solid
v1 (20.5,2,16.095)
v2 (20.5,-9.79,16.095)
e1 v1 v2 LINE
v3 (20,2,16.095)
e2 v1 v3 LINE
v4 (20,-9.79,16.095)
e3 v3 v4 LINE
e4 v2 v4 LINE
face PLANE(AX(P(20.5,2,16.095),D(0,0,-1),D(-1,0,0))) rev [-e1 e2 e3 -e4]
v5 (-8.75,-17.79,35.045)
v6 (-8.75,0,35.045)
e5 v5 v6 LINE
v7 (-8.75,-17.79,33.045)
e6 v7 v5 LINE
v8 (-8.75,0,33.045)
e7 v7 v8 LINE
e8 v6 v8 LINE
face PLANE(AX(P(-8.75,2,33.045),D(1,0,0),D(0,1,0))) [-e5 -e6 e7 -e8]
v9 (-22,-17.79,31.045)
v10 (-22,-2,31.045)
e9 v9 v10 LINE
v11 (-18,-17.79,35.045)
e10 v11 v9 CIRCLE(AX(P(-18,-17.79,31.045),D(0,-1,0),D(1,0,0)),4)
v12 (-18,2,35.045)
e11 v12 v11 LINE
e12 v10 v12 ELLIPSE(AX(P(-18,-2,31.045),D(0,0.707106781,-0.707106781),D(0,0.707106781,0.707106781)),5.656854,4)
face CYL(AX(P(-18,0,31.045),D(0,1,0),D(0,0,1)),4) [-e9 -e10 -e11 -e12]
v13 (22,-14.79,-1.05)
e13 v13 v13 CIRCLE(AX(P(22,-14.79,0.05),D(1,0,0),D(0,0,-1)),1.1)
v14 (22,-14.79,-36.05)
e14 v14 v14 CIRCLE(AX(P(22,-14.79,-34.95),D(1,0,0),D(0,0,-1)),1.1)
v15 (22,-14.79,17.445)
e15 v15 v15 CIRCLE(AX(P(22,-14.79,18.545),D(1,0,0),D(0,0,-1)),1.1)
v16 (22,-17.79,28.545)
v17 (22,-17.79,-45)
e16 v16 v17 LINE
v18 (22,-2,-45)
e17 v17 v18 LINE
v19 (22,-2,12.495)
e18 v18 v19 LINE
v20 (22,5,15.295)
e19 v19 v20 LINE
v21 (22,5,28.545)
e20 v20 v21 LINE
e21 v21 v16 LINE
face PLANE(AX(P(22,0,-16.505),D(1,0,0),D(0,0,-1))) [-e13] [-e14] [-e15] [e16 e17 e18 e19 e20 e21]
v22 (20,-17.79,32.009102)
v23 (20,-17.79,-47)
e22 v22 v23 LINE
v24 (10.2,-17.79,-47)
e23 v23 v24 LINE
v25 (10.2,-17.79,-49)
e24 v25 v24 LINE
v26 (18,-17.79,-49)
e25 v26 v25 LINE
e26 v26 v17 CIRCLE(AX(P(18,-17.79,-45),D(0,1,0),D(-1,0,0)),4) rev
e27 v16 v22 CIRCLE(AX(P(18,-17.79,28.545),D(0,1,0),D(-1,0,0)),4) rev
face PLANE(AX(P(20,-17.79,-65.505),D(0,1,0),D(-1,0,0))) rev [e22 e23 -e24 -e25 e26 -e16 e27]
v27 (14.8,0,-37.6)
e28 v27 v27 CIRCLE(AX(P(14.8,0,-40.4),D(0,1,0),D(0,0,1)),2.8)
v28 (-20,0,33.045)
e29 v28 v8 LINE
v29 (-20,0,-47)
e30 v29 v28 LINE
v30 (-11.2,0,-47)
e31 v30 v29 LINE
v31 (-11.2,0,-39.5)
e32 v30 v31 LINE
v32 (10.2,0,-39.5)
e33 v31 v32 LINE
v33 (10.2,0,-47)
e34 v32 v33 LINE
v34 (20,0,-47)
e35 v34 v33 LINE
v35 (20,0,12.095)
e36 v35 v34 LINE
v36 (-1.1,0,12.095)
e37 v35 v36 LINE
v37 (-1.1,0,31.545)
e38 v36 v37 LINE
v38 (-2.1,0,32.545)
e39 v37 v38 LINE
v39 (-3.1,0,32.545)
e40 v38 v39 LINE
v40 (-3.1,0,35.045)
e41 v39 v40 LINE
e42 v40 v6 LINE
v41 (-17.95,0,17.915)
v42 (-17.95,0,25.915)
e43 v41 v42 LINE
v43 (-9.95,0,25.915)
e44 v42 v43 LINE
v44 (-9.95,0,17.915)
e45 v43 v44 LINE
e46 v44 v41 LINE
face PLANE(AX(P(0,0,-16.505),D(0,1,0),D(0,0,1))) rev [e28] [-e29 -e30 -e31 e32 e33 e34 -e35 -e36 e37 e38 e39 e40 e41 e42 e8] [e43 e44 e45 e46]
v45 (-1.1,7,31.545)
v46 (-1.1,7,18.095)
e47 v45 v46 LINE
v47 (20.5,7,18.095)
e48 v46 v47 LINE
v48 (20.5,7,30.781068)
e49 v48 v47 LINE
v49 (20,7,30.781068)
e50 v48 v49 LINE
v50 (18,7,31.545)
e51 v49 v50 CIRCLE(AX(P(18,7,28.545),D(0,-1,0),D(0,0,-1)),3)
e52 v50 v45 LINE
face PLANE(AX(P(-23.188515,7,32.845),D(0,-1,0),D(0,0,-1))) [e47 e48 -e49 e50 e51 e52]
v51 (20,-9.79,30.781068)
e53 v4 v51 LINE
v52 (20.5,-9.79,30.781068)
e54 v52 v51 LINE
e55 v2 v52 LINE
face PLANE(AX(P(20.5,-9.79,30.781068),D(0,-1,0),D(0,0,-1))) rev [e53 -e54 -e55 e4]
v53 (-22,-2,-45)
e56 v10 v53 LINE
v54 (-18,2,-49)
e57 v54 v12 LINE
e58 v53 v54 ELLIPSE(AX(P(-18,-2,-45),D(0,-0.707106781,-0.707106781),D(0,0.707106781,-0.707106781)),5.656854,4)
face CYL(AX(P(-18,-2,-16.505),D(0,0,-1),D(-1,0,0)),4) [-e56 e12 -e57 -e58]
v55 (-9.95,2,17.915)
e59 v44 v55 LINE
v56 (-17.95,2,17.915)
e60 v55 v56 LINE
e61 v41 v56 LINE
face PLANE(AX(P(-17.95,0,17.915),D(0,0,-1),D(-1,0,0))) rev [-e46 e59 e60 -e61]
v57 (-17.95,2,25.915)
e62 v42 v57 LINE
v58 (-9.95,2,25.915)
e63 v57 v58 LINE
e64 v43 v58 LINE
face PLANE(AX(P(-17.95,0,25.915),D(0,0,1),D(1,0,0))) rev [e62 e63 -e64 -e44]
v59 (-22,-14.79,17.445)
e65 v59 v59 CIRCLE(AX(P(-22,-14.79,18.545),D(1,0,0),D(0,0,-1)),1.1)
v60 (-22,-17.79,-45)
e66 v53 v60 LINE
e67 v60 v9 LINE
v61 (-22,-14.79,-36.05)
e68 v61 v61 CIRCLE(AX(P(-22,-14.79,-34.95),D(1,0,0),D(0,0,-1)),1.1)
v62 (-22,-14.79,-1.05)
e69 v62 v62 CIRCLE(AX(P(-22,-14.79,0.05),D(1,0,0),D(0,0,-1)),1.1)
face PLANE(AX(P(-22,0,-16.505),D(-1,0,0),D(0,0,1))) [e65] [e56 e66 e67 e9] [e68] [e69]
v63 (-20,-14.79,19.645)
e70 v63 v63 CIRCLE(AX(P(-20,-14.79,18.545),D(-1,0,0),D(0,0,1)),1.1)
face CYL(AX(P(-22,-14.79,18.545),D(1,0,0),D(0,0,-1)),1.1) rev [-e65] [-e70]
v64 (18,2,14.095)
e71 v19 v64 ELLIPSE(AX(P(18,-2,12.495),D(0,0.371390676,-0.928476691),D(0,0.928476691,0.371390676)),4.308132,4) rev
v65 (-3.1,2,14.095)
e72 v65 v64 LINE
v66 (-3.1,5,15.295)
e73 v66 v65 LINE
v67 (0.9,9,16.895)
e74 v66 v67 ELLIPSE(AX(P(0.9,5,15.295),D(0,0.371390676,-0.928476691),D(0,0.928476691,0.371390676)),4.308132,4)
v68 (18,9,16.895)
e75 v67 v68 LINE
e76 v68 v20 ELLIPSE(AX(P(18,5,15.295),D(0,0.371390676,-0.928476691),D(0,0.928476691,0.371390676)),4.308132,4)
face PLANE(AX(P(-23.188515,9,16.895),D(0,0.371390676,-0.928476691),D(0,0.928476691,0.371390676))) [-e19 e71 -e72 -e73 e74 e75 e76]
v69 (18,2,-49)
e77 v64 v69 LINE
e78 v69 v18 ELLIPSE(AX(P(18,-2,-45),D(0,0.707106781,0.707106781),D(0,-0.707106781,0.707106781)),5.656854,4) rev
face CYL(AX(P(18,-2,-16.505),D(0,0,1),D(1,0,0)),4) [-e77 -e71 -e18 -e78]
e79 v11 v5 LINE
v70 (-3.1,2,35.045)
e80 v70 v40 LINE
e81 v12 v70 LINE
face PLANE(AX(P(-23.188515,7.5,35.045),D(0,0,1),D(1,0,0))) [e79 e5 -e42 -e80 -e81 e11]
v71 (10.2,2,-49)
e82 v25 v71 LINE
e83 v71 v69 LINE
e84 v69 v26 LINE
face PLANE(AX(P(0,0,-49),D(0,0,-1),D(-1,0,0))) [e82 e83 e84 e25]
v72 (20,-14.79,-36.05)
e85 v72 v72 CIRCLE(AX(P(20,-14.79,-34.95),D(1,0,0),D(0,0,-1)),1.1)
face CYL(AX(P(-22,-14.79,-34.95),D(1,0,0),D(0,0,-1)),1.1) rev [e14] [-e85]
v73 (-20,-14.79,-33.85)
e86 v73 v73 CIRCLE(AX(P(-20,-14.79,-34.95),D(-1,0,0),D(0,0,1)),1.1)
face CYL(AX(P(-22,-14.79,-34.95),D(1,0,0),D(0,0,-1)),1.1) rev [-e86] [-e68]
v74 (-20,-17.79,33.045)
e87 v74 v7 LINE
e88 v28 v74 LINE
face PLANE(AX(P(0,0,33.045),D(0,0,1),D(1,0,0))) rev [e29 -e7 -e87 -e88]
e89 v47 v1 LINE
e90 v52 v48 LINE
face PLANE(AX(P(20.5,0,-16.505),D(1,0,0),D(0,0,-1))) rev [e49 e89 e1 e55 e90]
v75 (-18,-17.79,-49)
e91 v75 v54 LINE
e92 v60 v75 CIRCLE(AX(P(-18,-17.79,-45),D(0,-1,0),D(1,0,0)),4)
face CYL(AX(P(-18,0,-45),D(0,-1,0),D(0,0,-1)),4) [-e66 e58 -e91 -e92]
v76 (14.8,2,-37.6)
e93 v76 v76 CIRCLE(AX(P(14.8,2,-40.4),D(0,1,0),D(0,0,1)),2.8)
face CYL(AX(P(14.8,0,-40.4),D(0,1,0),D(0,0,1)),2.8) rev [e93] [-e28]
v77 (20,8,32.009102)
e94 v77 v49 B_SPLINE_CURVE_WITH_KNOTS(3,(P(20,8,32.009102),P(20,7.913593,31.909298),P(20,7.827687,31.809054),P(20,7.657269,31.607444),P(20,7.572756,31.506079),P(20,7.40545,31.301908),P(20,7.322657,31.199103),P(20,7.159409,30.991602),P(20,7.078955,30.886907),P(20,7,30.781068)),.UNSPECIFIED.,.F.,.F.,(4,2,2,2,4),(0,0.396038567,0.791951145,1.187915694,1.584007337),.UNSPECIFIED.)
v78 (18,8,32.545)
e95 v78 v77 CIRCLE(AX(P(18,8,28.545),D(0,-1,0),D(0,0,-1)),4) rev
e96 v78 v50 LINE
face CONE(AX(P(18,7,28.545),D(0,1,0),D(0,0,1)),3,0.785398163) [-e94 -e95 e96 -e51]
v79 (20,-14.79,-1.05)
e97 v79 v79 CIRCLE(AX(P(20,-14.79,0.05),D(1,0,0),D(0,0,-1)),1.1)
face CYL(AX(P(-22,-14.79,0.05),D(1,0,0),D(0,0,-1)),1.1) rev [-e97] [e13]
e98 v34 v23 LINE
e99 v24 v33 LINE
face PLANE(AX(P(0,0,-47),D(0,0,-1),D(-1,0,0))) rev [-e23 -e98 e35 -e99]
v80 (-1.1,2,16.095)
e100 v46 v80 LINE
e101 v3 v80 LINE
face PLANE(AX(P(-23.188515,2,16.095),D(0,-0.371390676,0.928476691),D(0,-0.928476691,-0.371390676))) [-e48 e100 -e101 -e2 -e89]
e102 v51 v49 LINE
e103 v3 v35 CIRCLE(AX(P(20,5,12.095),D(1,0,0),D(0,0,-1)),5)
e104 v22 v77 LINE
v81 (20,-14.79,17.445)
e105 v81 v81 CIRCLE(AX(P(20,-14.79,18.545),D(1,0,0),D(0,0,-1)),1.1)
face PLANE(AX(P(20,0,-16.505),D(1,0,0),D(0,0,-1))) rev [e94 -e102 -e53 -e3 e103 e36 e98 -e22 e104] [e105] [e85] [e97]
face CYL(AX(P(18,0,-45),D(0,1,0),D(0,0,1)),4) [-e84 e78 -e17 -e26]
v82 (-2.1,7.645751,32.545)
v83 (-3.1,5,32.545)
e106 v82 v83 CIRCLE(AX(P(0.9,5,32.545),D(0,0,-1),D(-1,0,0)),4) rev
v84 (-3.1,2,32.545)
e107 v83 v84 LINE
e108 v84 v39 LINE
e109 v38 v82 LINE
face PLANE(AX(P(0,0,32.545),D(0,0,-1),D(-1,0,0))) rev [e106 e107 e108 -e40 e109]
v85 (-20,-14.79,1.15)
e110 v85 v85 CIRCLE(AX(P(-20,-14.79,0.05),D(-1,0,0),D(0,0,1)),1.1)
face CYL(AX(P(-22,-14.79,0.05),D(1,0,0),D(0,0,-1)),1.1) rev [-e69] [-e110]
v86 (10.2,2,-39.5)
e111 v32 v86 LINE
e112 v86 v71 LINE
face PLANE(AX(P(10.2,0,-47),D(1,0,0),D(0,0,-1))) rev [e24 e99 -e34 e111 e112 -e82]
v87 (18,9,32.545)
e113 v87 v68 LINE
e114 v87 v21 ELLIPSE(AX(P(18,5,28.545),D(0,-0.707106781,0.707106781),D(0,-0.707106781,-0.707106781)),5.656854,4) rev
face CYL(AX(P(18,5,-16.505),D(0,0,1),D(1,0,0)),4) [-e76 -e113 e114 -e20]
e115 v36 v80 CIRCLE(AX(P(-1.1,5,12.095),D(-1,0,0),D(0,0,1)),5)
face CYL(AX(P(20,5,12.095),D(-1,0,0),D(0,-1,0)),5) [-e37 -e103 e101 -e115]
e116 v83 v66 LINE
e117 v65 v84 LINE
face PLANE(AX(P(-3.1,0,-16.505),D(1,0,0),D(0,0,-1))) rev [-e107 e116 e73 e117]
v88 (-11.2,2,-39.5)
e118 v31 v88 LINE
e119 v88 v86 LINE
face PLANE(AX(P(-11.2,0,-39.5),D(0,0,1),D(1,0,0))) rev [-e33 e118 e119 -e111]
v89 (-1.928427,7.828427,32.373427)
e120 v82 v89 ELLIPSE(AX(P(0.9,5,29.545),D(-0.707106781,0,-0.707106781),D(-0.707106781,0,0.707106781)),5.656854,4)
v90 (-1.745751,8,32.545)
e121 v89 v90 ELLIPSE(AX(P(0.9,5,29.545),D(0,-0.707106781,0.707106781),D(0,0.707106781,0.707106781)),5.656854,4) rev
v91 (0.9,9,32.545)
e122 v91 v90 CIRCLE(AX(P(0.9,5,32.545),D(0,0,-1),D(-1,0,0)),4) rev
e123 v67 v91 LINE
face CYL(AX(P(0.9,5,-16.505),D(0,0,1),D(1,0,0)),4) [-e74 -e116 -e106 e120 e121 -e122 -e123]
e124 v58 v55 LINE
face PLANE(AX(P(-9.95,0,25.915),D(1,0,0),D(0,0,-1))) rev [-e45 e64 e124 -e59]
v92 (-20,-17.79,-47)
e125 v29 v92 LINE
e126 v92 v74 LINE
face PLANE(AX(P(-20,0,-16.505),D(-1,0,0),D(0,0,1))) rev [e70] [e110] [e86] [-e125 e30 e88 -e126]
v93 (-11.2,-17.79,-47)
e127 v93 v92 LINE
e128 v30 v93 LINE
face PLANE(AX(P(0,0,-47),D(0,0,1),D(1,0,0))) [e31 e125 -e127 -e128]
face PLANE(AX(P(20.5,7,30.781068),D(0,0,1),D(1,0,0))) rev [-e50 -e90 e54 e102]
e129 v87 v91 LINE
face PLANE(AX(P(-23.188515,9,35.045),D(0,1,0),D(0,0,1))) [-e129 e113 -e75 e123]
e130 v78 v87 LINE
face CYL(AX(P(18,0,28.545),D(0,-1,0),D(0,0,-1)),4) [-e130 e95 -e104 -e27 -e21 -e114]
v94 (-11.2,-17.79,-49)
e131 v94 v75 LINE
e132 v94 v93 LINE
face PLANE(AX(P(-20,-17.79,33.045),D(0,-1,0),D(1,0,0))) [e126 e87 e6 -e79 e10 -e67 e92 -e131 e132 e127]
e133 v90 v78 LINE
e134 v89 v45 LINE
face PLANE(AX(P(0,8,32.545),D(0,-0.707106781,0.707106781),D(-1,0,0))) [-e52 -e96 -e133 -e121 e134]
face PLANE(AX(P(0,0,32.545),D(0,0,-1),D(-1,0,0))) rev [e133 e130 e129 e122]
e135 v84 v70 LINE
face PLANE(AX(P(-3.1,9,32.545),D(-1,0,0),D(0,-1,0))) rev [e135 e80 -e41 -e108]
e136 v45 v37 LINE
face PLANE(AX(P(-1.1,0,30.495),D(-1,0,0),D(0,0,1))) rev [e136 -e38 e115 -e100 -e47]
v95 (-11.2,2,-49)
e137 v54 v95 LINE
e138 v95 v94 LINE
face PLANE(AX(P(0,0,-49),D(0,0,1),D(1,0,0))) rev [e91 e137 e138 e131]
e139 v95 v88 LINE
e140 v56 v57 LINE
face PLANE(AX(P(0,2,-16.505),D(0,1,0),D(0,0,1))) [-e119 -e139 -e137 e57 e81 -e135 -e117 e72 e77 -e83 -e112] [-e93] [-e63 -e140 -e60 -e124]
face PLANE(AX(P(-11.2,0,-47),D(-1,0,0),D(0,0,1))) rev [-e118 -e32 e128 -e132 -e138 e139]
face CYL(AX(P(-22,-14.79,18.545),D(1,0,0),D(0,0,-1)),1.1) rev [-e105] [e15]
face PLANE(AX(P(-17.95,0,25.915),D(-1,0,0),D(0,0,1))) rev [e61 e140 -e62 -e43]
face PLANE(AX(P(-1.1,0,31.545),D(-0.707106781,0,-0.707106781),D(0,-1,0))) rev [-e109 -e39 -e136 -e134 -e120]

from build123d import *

# Parameters (mm, degrees)
SKETCH1_W               = 40
SKETCH1_H               = 94
BOSS_EXTRUDE1_DEPTH     = 2
SKETCH2_R               = 2.8
SKETCH2_W               = 21.4
SKETCH2_H               = 7.5
SKETCH2_W_2             = 8
SKETCH2_H_2             = 8
SKETCH2_W_3             = 21.1
SKETCH2_H_3             = 14.4
CUT_EXTRUDE1_DEPTH      = 52.117511677
BOSS_EXTRUDE2_DEPTH     = 21.1
BOSS_EXTRUDE3_DEPTH     = 2
SKETCH5_W               = 18.9
SKETCH5_H               = 4.55
BOSS_EXTRUDE5_DEPTH     = 2
SKETCH6_W               = 11.25
SKETCH6_H               = 19.79
BOSS_EXTRUDE6_DEPTH     = 2
SKETCH7_W               = 98.55
SKETCH7_H               = 19.79
BOSS_EXTRUDE7_DEPTH     = 2
SKETCH8_W               = 10.8
SKETCH8_H               = 19.79
SKETCH8_W_2             = 9.8
BOSS_EXTRUDE8_DEPTH     = 2
BOSS_EXTRUDE9_DEPTH     = 2
SKETCH12_R              = 1.1
CUT_EXTRUDE2_DEPTH      = 71.070582986
LPATTERN1_COUNT         = 3
LPATTERN1_PITCH         = 35
SKETCH13_W              = 25.1
SKETCH13_H              = 26.79
CUT_EXTRUDE3_DEPTH      = 2.5
FILLET1_R               = 4
FILLET2_R               = 5
CHAMFER1_SIZE           = 1
CUT_EXTRUDE4_DEPTH      = 0.5
CUT_EXTRUDE5_DEPTH      = 60.439436404
CUT_EXTRUDE5_DEPTH_BACK = 60.439436404
SKETCH15_W              = 44
SKETCH15_H              = 16.505


with BuildPart() as part:
    # Sketch1 → Boss-Extrude1 (new body)
    with BuildSketch(Plane(origin=(0, 0, 0), x_dir=(1, 0, 0), z_dir=(0, 1, 0))):
        Rectangle(SKETCH1_W, SKETCH1_H)
    extrude(amount=BOSS_EXTRUDE1_DEPTH)

    # Sketch2 → Cut-Extrude1 (cut, through all)
    with BuildSketch(Plane(origin=(0, 2, 0), x_dir=(1, 0, 0), z_dir=(0, 1, 0))):
        with Locations(Location((14.8, 40.4, 0), (0, 0, 270))):
            Circle(SKETCH2_R)
        with Locations((-0.5, 43.25)):
            Rectangle(SKETCH2_W, SKETCH2_H)
        with Locations((0.05, -20.02)):
            Rectangle(SKETCH2_W_2, SKETCH2_H_2)
        with Locations((14.05, -20.02)):
            Rectangle(SKETCH2_W_2, SKETCH2_H_2)
        with Locations((-13.95, -20.02)):
            Rectangle(SKETCH2_W_2, SKETCH2_H_2)
        with Locations((-13.95, -38.42)):
            Rectangle(SKETCH2_W_2, SKETCH2_H_2)
        with Locations((9.45, -39.8)):
            Rectangle(SKETCH2_W_3, SKETCH2_H_3)
    extrude(amount=-CUT_EXTRUDE1_DEPTH, mode=Mode.SUBTRACT)

    # Sketch3 → Boss-Extrude2 (add)
    with BuildSketch(Plane(origin=(20, 0, 0), x_dir=(0, 0, -1), z_dir=(1, 0, 0))):
        Polygon((-32.6, 2), (-34.6, 7), (-49.35, 7), (-49.35, 7.5), (-51.55, 7.5), (-51.55, 9), (-33.4, 9), (-30.6, 2), align=None)
    extrude(amount=-BOSS_EXTRUDE2_DEPTH)

    # Sketch4 → Boss-Extrude3 (add)
    with BuildSketch(Plane.ZY.offset(1.1)):
        Polygon((51.55, 9), (51.55, 2), (30.6, 2), (33.4, 9), align=None)
    extrude(amount=BOSS_EXTRUDE3_DEPTH)

    # Sketch5 → Boss-Extrude5 (add)
    with BuildSketch(Plane(origin=(0, 2, 0), x_dir=(1, 0, 0), z_dir=(0, 1, 0))):
        with Locations((-10.55, -49.275)):
            Rectangle(SKETCH5_W, SKETCH5_H)
    extrude(amount=-BOSS_EXTRUDE5_DEPTH)

    # Sketch6 → Boss-Extrude6 (add)
    with BuildSketch(Plane.XY.offset(51.55)):
        with Locations((-14.375, -7.895)):
            Rectangle(SKETCH6_W, SKETCH6_H)
    extrude(amount=-BOSS_EXTRUDE6_DEPTH)

    # Sketch7 → Boss-Extrude7 (add)
    with BuildSketch(Plane.ZY.offset(20)):
        with Locations((2.275, -7.895)):
            Rectangle(SKETCH7_W, SKETCH7_H)
    extrude(amount=BOSS_EXTRUDE7_DEPTH)

    # Sketch8 → Boss-Extrude8 (add)
    with BuildSketch(Plane(origin=(0, 0, -47), x_dir=(-1, 0, 0), z_dir=(0, 0, -1))):
        with Locations((16.6, -7.895)):
            Rectangle(SKETCH8_W, SKETCH8_H)
        with Locations((-15.1, -7.895)):
            Rectangle(SKETCH8_W_2, SKETCH8_H)
    extrude(amount=BOSS_EXTRUDE8_DEPTH)

    # Sketch9 → Boss-Extrude9 (add)
    with BuildSketch(Plane(origin=(20, 0, 0), x_dir=(0, 0, -1), z_dir=(1, 0, 0))):
        Polygon((-51.55, 9), (-51.55, -17.79), (49, -17.79), (49, 2), (-30.6, 2), (-33.4, 9), align=None)
    extrude(amount=BOSS_EXTRUDE9_DEPTH)

    # Sketch12 → Cut-Extrude2 (cut, symmetric)
    with BuildSketch(Plane(origin=(22, 0, 0), x_dir=(0, 0, -1), z_dir=(1, 0, 0))):
        with Locations((34.95, -14.79)):
            Circle(SKETCH12_R)
    cut_extrude2 = extrude(amount=CUT_EXTRUDE2_DEPTH, both=True, mode=Mode.SUBTRACT)

    # LPattern1: Cut-Extrude2 ×3
    with Locations(*[(0, 0, i * LPATTERN1_PITCH) for i in range(1, LPATTERN1_COUNT)]):
        add(cut_extrude2, mode=Mode.SUBTRACT)

    # Sketch13 → Cut-Extrude3 (cut)
    with BuildSketch(Plane.XY.offset(51.55)):
        with Locations((9.45, -4.395)):
            Rectangle(SKETCH13_W, SKETCH13_H)
    extrude(amount=-CUT_EXTRUDE3_DEPTH, mode=Mode.SUBTRACT)

    # Fillet1
    # the kernel refuses this fillet: 4 mm, written as the material it takes off along each edge
    with BuildSketch(Plane(origin=(22, -27.79, -49), x_dir=(-1, 0, 0), z_dir=(0, 1, 0))) as fillet1_piece_1:
        with BuildLine():
            CenterArc((FILLET1_R, FILLET1_R), FILLET1_R, 180, 90)
            Line((0, FILLET1_R), (0, 0))
            Line((0, 0), (FILLET1_R, 0))
        make_face()
    extrude(amount=39.79, mode=Mode.SUBTRACT)
    with BuildSketch(Plane(origin=(22, 9, 23.4), x_dir=(0, -1, 0), z_dir=(0, 0, 1))) as fillet1_piece_2:
        with BuildLine():
            CenterArc((FILLET1_R, -FILLET1_R), FILLET1_R, 90, 90)
            Line((0, -FILLET1_R), (0, 0))
            Line((0, 0), (FILLET1_R, 0))
        make_face()
    extrude(amount=35.65, mode=Mode.SUBTRACT)
    with BuildSketch(Plane(origin=(22, 2, -59), x_dir=(-1, 0, 0), z_dir=(0, 0, 1))) as fillet1_piece_3_section:
        with BuildLine():
            CenterArc((FILLET1_R, FILLET1_R), FILLET1_R, 180, 90)
            Line((0, FILLET1_R), (0, 0))
            Line((0, 0), (FILLET1_R, 0))
        make_face()
    fillet1_piece_3 = extrude(amount=99.6, mode=Mode.PRIVATE)
    fillet1_piece_3 = split(fillet1_piece_3, bisect_by=Plane(origin=(22, -28.896551724, 18.24137931), z_dir=(0, 0.3713906763541048, -0.928476690885259)), keep=Keep.TOP, mode=Mode.PRIVATE)
    add(fillet1_piece_3, mode=Mode.SUBTRACT)
    with BuildSketch(Plane(origin=(-22, -27.79, -49), x_dir=(1, 0, 0), z_dir=(0, 1, 0)), Plane(origin=(-22, 12, 51.55), x_dir=(1, 0, 0), z_dir=(0, -1, 0))) as fillet1_piece_4:
        with BuildLine():
            CenterArc((FILLET1_R, -FILLET1_R), FILLET1_R, 90, 90)
            Line((0, -FILLET1_R), (0, 0))
            Line((0, 0), (FILLET1_R, 0))
        make_face()
    extrude(amount=39.79, mode=Mode.SUBTRACT)
    with BuildSketch(Plane(origin=(-22, 2, -59), x_dir=(1, 0, 0), z_dir=(0, 0, 1))) as fillet1_piece_5:
        with BuildLine():
            CenterArc((FILLET1_R, -FILLET1_R), FILLET1_R, 90, 90)
            Line((0, -FILLET1_R), (0, 0))
            Line((0, 0), (FILLET1_R, 0))
        make_face()
    extrude(amount=120.55, mode=Mode.SUBTRACT)
    with BuildSketch(Plane(origin=(-3.1, 9, 23.4), x_dir=(0, -1, 0), z_dir=(0, 0, 1))) as fillet1_piece_6:
        with BuildLine():
            CenterArc((FILLET1_R, FILLET1_R), FILLET1_R, 180, 90)
            Line((0, FILLET1_R), (0, 0))
            Line((0, 0), (FILLET1_R, 0))
        make_face()
    extrude(amount=35.65, mode=Mode.SUBTRACT)
    with BuildSketch(Plane(origin=(22, -27.79, 49.05), x_dir=(-1, 0, 0), z_dir=(0, 1, 0))) as fillet1_piece_7:
        with BuildLine():
            CenterArc((FILLET1_R, -FILLET1_R), FILLET1_R, 90, 90)
            Line((0, -FILLET1_R), (0, 0))
            Line((0, 0), (FILLET1_R, 0))
        make_face()
    extrude(amount=46.79, mode=Mode.SUBTRACT)

    # Fillet2
    # the kernel refuses this fillet: 5 mm, written as the material it takes off along each edge
    with BuildSketch(Plane(origin=(20, 0, 32.6), x_dir=(0, 0, -1), z_dir=(-1, 0, 0))) as fillet2_piece_1:
        with BuildLine():
            CenterArc((4, -5), FILLET2_R, 90, 53.130102354)
            Line((0, -2), (0, 0))
            Line((0, 0), (4, 0))
        make_face()
    extrude(amount=21.1, mode=Mode.SUBTRACT)

    # Chamfer1
    # the kernel refuses this chamfer: 1 mm, written as the material it takes off along each edge
    with BuildSketch(Plane(origin=(-1.1, 7, 49.05), x_dir=(-1, 0, 0), z_dir=(0, -1, 0))) as chamfer1_piece_1:
        Polygon((CHAMFER1_SIZE, 0), (0, CHAMFER1_SIZE), (0, 0), align=None)
    extrude(amount=9.571682988, mode=Mode.SUBTRACT)
    with BuildSketch(Plane(origin=(-1.1, 7, 49.05), x_dir=(0, 1, 0), z_dir=(1, 0, 0))) as chamfer1_piece_2:
        Polygon((CHAMFER1_SIZE, 0), (0, -CHAMFER1_SIZE), (0, 0), align=None)
    extrude(amount=19.1, mode=Mode.SUBTRACT)
    with BuildSketch(Plane(origin=(18, 7, 45.05), x_dir=(0.919398394096703, 0, 0.3933275898438904), z_dir=(0.3933275898438904, 0, -0.919398394096703))) as chamfer1_piece_3_section:
        Polygon((4, -CHAMFER1_SIZE), (4 - CHAMFER1_SIZE, 0), (4, 0), align=None)
    chamfer1_piece_3 = revolve(axis=Axis((18, 7, 45.05), (0, -1, 0)), revolution_arc=66.838289129, mode=Mode.PRIVATE)
    chamfer1_piece_3 = split(chamfer1_piece_3, bisect_by=Plane(origin=(20, 7, 45.05), z_dir=(-1, 0, 0)), keep=Keep.TOP, mode=Mode.PRIVATE)
    add(chamfer1_piece_3, mode=Mode.SUBTRACT)
    with BuildSketch(Plane(origin=(-3.671682988, 7, 49.05), x_dir=(0, 1, 0), z_dir=(1, 0, 0))) as chamfer1_piece_4a_section:
        Polygon((CHAMFER1_SIZE, 0), (0, -CHAMFER1_SIZE), (0, 0), align=None)
    chamfer1_piece_4a = extrude(amount=21.671682988, mode=Mode.PRIVATE)
    chamfer1_piece_4a = split(chamfer1_piece_4a, bisect_by=Plane(origin=(-1.1, 7, 49.05), z_dir=(-1, 0, 0)), keep=Keep.TOP, mode=Mode.PRIVATE)
    with BuildSketch(Plane(origin=(-1.1, 9.571682988, 49.05), x_dir=(-1, 0, 0), z_dir=(0, -1, 0))) as chamfer1_piece_4b_section:
        Polygon((CHAMFER1_SIZE, 0), (0, CHAMFER1_SIZE), (0, 0), align=None)
    chamfer1_piece_4b = extrude(amount=12.143365976, mode=Mode.PRIVATE)
    chamfer1_piece_4b = split(chamfer1_piece_4b, bisect_by=Plane(origin=(-1.1, 7, 49.05), z_dir=(0, 1, 0)), keep=Keep.TOP, mode=Mode.PRIVATE)
    chamfer1_piece_4 = chamfer1_piece_4a & chamfer1_piece_4b
    add(chamfer1_piece_4, mode=Mode.SUBTRACT)

    # Sketch14 → Cut-Extrude4 (cut)
    with BuildSketch(Plane.ZY.offset(-20)):
        Polygon((47.286067977, 7), (34.6, 7), (32.6, 2), (32.6, -9.79), (47.286067977, -9.79), align=None)
    extrude(amount=-CUT_EXTRUDE4_DEPTH, mode=Mode.SUBTRACT)

    # Sketch15 → Cut-Extrude5 (cut, two sides: drawn at the far end of the back side and taken through both)
    with BuildSketch(Plane(origin=(0, 2, 0), x_dir=(1, 0, 0), z_dir=(0, 1, 0)).offset(-CUT_EXTRUDE5_DEPTH_BACK)):
        with Locations((0, -20.02)):
            Rectangle(SKETCH15_W, SKETCH15_H)
    extrude(amount=CUT_EXTRUDE5_DEPTH + CUT_EXTRUDE5_DEPTH_BACK, mode=Mode.SUBTRACT)


with BuildPart() as cut_extrude5_piece_1:
    # of the separate pieces the step leaves, piece 1, a body of its own (cut_extrude5_pieces)
    add(part.part.solids().sort_by_distance((-11.2, 2, -39.5))[0])


with BuildPart() as cut_extrude5_piece_2:
    # of the separate pieces the step leaves, piece 2, a body of its own (cut_extrude5_pieces)
    add(part.part.solids().sort_by_distance((-20, 0, 49.55))[0])


with BuildPart() as cut_extrude5_piece_2_1:
    # Body-Move/Copy1: read off the stored shape, not the designer's step
    # Body-Move/Copy1: moved
    add(cut_extrude5_piece_2.part.moved(Location((0, 0, -16.505))))

    # Combine1: union Cut-Extrude5 piece 1
    add(cut_extrude5_piece_1.part)


solid = cut_extrude5_piece_2_1.part
